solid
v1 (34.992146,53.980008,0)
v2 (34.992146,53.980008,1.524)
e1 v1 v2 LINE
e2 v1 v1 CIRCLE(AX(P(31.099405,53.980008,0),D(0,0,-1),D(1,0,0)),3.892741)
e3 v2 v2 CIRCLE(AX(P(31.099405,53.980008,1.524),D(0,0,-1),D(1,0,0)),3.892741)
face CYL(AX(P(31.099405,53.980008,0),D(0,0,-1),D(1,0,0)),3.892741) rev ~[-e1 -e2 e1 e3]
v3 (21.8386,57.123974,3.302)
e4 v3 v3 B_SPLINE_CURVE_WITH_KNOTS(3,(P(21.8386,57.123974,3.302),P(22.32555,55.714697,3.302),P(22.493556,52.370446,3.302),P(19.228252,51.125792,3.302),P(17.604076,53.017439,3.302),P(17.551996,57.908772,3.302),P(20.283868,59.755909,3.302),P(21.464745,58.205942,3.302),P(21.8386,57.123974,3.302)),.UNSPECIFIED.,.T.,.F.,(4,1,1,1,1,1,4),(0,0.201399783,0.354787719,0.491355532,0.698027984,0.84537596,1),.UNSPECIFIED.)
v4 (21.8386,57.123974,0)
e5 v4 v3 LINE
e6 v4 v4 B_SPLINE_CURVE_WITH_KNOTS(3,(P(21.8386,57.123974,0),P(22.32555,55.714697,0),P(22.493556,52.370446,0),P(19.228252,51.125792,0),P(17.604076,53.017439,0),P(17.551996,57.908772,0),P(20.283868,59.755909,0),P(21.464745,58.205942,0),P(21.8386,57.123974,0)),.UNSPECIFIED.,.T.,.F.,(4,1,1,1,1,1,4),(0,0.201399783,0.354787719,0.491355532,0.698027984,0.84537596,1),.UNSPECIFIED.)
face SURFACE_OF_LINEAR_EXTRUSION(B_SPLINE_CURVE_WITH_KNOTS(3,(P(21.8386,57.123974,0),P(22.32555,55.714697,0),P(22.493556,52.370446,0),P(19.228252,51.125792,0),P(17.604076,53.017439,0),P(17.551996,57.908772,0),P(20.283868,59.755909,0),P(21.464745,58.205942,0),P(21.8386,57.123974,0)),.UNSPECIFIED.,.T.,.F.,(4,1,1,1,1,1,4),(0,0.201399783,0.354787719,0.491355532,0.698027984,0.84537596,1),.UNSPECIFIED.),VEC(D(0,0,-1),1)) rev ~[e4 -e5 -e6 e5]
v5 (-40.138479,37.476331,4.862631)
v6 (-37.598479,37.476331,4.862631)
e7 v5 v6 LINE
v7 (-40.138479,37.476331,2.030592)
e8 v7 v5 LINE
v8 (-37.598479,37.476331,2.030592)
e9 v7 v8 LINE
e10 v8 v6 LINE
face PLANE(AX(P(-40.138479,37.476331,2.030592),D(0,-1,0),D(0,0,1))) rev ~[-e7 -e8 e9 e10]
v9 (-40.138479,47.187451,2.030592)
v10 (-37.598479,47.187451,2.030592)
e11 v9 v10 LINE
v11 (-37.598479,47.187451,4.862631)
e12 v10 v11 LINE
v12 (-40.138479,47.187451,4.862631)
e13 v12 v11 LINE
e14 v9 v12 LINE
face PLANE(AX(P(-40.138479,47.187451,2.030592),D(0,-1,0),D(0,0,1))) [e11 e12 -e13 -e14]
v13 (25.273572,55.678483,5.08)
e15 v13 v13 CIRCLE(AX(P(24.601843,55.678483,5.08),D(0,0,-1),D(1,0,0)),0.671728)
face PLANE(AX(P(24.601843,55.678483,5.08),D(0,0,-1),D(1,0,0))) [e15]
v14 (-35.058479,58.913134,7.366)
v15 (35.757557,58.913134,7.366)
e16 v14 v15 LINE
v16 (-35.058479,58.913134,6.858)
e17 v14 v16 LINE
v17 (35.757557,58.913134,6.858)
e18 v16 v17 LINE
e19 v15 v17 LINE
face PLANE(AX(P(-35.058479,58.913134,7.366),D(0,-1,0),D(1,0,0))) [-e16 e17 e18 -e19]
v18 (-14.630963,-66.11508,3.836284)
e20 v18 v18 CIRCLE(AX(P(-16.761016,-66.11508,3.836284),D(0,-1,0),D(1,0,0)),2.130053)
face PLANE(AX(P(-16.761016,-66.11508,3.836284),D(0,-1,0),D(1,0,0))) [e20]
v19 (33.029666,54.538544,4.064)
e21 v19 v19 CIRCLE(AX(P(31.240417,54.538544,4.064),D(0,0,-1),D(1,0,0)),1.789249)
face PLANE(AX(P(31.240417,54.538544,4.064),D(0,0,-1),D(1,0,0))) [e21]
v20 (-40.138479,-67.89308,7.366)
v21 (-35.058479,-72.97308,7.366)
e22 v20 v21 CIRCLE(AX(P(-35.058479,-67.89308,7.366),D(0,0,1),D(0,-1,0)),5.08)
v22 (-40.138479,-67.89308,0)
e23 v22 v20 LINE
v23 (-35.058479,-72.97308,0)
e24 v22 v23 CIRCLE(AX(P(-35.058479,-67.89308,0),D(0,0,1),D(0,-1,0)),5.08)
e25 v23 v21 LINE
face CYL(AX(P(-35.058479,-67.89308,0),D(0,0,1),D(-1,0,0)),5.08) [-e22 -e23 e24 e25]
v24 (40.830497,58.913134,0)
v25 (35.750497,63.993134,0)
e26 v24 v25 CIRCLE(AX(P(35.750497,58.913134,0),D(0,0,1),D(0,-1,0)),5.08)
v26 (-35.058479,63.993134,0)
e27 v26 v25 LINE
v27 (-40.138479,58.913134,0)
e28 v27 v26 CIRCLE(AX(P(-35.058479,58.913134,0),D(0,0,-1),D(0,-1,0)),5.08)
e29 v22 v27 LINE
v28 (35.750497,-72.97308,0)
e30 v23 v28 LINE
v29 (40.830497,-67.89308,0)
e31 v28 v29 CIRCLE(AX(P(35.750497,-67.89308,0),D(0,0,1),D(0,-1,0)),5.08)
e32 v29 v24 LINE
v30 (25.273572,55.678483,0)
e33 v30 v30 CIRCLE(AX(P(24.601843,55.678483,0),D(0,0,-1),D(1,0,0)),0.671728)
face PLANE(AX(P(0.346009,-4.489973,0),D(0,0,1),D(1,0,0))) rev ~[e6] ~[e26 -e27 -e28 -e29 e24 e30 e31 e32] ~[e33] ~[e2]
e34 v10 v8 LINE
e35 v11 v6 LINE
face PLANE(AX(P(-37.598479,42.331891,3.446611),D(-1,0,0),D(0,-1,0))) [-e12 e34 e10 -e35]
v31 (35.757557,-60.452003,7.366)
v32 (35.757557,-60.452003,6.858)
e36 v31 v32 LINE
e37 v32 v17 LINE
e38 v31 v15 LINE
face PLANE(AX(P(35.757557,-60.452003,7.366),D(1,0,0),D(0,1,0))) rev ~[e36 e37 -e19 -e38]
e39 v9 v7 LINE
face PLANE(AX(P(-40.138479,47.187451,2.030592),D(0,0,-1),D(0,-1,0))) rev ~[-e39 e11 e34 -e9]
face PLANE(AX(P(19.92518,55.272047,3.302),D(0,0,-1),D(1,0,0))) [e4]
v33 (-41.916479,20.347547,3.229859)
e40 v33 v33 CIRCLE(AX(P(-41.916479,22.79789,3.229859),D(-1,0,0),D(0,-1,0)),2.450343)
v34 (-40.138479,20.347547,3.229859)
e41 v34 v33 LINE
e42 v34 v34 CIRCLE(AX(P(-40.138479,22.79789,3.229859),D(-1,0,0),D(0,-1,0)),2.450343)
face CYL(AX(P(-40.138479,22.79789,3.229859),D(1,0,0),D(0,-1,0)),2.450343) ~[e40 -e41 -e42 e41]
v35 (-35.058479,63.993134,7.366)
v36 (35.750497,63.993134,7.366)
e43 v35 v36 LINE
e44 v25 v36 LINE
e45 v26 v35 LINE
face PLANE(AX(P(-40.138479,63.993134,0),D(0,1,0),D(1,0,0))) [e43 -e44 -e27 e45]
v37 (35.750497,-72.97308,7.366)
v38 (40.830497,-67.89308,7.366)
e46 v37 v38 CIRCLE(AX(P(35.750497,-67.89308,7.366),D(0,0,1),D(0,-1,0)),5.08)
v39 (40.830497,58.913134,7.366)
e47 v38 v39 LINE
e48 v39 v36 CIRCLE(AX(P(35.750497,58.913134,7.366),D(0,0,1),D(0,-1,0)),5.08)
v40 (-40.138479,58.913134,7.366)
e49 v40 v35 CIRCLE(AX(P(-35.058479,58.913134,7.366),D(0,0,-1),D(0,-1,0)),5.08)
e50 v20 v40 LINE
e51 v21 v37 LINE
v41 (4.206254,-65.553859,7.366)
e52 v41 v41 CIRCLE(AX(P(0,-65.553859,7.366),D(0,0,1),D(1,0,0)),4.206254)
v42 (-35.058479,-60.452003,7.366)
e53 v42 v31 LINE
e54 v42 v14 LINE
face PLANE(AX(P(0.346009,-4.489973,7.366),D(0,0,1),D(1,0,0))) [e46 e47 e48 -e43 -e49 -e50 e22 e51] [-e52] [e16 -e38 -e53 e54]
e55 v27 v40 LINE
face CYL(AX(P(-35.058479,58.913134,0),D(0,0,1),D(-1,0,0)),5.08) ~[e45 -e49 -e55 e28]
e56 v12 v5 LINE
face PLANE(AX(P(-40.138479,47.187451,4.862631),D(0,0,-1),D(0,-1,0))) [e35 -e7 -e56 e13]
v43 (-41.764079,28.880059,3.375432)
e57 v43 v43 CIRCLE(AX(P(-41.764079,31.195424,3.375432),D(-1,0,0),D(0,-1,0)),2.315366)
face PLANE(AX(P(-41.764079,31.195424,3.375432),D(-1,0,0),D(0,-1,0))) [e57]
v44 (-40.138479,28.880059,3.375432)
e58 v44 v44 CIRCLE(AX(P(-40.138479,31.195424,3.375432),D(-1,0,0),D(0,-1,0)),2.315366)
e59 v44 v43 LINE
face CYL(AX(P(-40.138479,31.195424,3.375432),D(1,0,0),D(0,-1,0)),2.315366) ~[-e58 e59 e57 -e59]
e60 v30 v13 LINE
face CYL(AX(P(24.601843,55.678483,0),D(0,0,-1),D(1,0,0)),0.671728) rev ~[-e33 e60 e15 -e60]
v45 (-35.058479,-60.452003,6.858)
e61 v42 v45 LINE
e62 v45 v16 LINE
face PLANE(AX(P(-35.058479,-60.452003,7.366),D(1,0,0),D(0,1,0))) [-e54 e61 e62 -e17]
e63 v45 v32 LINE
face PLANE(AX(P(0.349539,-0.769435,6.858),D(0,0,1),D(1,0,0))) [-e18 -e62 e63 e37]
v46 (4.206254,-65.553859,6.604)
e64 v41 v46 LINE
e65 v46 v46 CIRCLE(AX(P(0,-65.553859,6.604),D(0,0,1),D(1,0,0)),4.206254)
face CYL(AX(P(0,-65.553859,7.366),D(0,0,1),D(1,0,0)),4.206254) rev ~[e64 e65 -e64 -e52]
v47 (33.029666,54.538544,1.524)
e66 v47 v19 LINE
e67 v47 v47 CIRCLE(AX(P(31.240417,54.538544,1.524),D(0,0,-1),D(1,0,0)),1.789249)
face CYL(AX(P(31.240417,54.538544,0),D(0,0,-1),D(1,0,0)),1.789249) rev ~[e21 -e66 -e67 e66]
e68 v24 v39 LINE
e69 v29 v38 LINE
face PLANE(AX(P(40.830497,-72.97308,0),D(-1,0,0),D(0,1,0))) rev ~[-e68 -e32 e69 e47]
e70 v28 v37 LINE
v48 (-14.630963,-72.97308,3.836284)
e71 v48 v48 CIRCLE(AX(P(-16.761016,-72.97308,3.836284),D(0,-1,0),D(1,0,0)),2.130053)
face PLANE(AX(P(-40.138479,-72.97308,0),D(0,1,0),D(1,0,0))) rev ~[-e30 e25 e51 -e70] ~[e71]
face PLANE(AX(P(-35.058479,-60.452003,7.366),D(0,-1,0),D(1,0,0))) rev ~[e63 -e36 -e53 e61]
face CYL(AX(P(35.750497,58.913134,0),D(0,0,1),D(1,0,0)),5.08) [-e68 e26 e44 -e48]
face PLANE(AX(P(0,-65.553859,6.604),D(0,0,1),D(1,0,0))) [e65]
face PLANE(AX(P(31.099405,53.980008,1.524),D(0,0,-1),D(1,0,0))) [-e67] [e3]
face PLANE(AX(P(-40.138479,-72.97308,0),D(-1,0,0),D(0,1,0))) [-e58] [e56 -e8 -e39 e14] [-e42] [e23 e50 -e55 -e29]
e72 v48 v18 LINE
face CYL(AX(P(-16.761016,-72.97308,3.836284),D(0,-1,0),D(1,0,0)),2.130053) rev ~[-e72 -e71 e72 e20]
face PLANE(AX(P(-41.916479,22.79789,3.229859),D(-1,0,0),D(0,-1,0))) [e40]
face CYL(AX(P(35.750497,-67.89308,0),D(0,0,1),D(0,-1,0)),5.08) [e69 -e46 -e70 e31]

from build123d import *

# Parameters (mm, degrees)
F0_W      = 80.9689760208
F0_H      = 136.9662135839
F1_DEPTH  = 7.366
F2_R      = 5.08
F3_W      = 70.8160358799
F3_H      = 119.3651366365
F4_DEPTH  = 0.508
F5_R      = 4.2062537649
F6_DEPTH  = 0.762
F7_W      = 9.7111202776
F7_H      = 2.8320385609
F8_DEPTH  = 2.54
F9_R      = 2.3153657449
F10_DEPTH = 1.6256
F11_R     = 2.4503430009
F12_DEPTH = 1.778
F14_R     = 3.8927406251
F15_DEPTH = 1.524
F16_R     = 1.7892494252
F17_DEPTH = 4.064
F18_R     = 0.6717284453
F19_DEPTH = 5.08
F21_DEPTH = 3.302
F22_R     = 2.1300534038
F23_DEPTH = 6.858


with BuildPart() as f1:
    # F0 (on Top) → F1 (new body)
    with BuildSketch(Plane.XY):
        with Locations((0.3460086882, -4.4899731874)):
            Rectangle(F0_W, F0_H)
    extrude(amount=F1_DEPTH)

    # F2
    f2_edges = [f1.edges().sort_by_distance(p)[0] for p in [
        (-40.138479, 63.993134, 3.683),
        (40.830497, 63.993134, 3.683),
        (40.830497, -72.97308, 3.683),
        (-40.138479, -72.97308, 3.683),
    ]]
    fillet(f2_edges, radius=F2_R)

    # F3 (on face) → F4 (cut)
    with BuildSketch(Plane.XY.offset(7.366)):
        with Locations((0.3495386177, -0.7694347137)):
            Rectangle(F3_W, F3_H)
    extrude(amount=-F4_DEPTH, mode=Mode.SUBTRACT)

    # F5 (on face) → F6 (cut)
    with BuildSketch(Plane.XY.offset(7.366)):
        with Locations((0, -65.5538588762)):
            Circle(F5_R)
    extrude(amount=-F6_DEPTH, mode=Mode.SUBTRACT)

    # F7 (on face) → F8 (cut)
    with BuildSketch(Plane(origin=(-40.1384793222, 0, 0), x_dir=(0, -1, 0), z_dir=(-1, 0, 0))):
        with Locations((-42.3318911344, 3.4466114594)):
            Rectangle(F7_W, F7_H)
    extrude(amount=-F8_DEPTH, mode=Mode.SUBTRACT)

    # F9 (on face) → F10 (join)
    with BuildSketch(Plane(origin=(-40.1384793222, 0, 0), x_dir=(0, -1, 0), z_dir=(-1, 0, 0))):
        with Locations((-31.1954244971, 3.375432454)):
            Circle(F9_R)
    extrude(amount=F10_DEPTH)

    # F11 (on face) → F12 (join)
    with BuildSketch(Plane(origin=(-40.1384793222, 0, 0), x_dir=(0, -1, 0), z_dir=(-1, 0, 0))):
        with Locations((-22.7978900075, 3.2298590522)):
            Circle(F11_R)
    extrude(amount=F12_DEPTH)

    # F14 (on face) → F15 (cut)
    with BuildSketch(Plane(origin=(0, 0, 0), x_dir=(1, 0, 0), z_dir=(0, 0, -1))):
        with Locations((31.0994051397, -53.9800077677)):
            Circle(F14_R)
    extrude(amount=-F15_DEPTH, mode=Mode.SUBTRACT)

    # F16 (on face) → F17 (cut)
    with BuildSketch(Plane(origin=(0, 0, 0), x_dir=(1, 0, 0), z_dir=(0, 0, -1))):
        with Locations((31.2404166907, -54.5385442674)):
            Circle(F16_R)
    extrude(amount=-F17_DEPTH, mode=Mode.SUBTRACT)

    # F18 (on face) → F19 (cut)
    with BuildSketch(Plane(origin=(0, 0, 0), x_dir=(1, 0, 0), z_dir=(0, 0, -1))):
        with Locations((24.6018432081, -55.6784830987)):
            Circle(F18_R)
    extrude(amount=-F19_DEPTH, mode=Mode.SUBTRACT)

    # F20 (on face) → F21 (cut)
    with BuildSketch(Plane(origin=(0, 0, 0), x_dir=(1, 0, 0), z_dir=(0, 0, -1))):
        with BuildLine():
            add(Edge.make_bspline(
                [(21.838599816, -57.1239739656), (22.3255501081, -55.7146974508), (22.4935564689, -52.3704464682), (19.2282519734, -51.1257918433), (17.6040761183, -53.0174394253), (17.5519956723, -57.9087722175), (20.2838683925, -59.75590869), (21.4647452863, -58.2059415034), (21.838599816, -57.1239739656)],
                knots=[0, 0, 0, 0, 0.2013997834, 0.354787719, 0.491355532, 0.6980279839, 0.8453759603, 1, 1, 1, 1], degree=3))
        make_face()
    extrude(amount=-F21_DEPTH, mode=Mode.SUBTRACT)

    # F22 (on face) → F23 (cut)
    with BuildSketch(Plane.XZ.offset(72.9730799794)):
        with Locations((-16.7610161006, 3.8362841588)):
            Circle(F22_R)
    extrude(amount=-F23_DEPTH, mode=Mode.SUBTRACT)


solid = f1.part
